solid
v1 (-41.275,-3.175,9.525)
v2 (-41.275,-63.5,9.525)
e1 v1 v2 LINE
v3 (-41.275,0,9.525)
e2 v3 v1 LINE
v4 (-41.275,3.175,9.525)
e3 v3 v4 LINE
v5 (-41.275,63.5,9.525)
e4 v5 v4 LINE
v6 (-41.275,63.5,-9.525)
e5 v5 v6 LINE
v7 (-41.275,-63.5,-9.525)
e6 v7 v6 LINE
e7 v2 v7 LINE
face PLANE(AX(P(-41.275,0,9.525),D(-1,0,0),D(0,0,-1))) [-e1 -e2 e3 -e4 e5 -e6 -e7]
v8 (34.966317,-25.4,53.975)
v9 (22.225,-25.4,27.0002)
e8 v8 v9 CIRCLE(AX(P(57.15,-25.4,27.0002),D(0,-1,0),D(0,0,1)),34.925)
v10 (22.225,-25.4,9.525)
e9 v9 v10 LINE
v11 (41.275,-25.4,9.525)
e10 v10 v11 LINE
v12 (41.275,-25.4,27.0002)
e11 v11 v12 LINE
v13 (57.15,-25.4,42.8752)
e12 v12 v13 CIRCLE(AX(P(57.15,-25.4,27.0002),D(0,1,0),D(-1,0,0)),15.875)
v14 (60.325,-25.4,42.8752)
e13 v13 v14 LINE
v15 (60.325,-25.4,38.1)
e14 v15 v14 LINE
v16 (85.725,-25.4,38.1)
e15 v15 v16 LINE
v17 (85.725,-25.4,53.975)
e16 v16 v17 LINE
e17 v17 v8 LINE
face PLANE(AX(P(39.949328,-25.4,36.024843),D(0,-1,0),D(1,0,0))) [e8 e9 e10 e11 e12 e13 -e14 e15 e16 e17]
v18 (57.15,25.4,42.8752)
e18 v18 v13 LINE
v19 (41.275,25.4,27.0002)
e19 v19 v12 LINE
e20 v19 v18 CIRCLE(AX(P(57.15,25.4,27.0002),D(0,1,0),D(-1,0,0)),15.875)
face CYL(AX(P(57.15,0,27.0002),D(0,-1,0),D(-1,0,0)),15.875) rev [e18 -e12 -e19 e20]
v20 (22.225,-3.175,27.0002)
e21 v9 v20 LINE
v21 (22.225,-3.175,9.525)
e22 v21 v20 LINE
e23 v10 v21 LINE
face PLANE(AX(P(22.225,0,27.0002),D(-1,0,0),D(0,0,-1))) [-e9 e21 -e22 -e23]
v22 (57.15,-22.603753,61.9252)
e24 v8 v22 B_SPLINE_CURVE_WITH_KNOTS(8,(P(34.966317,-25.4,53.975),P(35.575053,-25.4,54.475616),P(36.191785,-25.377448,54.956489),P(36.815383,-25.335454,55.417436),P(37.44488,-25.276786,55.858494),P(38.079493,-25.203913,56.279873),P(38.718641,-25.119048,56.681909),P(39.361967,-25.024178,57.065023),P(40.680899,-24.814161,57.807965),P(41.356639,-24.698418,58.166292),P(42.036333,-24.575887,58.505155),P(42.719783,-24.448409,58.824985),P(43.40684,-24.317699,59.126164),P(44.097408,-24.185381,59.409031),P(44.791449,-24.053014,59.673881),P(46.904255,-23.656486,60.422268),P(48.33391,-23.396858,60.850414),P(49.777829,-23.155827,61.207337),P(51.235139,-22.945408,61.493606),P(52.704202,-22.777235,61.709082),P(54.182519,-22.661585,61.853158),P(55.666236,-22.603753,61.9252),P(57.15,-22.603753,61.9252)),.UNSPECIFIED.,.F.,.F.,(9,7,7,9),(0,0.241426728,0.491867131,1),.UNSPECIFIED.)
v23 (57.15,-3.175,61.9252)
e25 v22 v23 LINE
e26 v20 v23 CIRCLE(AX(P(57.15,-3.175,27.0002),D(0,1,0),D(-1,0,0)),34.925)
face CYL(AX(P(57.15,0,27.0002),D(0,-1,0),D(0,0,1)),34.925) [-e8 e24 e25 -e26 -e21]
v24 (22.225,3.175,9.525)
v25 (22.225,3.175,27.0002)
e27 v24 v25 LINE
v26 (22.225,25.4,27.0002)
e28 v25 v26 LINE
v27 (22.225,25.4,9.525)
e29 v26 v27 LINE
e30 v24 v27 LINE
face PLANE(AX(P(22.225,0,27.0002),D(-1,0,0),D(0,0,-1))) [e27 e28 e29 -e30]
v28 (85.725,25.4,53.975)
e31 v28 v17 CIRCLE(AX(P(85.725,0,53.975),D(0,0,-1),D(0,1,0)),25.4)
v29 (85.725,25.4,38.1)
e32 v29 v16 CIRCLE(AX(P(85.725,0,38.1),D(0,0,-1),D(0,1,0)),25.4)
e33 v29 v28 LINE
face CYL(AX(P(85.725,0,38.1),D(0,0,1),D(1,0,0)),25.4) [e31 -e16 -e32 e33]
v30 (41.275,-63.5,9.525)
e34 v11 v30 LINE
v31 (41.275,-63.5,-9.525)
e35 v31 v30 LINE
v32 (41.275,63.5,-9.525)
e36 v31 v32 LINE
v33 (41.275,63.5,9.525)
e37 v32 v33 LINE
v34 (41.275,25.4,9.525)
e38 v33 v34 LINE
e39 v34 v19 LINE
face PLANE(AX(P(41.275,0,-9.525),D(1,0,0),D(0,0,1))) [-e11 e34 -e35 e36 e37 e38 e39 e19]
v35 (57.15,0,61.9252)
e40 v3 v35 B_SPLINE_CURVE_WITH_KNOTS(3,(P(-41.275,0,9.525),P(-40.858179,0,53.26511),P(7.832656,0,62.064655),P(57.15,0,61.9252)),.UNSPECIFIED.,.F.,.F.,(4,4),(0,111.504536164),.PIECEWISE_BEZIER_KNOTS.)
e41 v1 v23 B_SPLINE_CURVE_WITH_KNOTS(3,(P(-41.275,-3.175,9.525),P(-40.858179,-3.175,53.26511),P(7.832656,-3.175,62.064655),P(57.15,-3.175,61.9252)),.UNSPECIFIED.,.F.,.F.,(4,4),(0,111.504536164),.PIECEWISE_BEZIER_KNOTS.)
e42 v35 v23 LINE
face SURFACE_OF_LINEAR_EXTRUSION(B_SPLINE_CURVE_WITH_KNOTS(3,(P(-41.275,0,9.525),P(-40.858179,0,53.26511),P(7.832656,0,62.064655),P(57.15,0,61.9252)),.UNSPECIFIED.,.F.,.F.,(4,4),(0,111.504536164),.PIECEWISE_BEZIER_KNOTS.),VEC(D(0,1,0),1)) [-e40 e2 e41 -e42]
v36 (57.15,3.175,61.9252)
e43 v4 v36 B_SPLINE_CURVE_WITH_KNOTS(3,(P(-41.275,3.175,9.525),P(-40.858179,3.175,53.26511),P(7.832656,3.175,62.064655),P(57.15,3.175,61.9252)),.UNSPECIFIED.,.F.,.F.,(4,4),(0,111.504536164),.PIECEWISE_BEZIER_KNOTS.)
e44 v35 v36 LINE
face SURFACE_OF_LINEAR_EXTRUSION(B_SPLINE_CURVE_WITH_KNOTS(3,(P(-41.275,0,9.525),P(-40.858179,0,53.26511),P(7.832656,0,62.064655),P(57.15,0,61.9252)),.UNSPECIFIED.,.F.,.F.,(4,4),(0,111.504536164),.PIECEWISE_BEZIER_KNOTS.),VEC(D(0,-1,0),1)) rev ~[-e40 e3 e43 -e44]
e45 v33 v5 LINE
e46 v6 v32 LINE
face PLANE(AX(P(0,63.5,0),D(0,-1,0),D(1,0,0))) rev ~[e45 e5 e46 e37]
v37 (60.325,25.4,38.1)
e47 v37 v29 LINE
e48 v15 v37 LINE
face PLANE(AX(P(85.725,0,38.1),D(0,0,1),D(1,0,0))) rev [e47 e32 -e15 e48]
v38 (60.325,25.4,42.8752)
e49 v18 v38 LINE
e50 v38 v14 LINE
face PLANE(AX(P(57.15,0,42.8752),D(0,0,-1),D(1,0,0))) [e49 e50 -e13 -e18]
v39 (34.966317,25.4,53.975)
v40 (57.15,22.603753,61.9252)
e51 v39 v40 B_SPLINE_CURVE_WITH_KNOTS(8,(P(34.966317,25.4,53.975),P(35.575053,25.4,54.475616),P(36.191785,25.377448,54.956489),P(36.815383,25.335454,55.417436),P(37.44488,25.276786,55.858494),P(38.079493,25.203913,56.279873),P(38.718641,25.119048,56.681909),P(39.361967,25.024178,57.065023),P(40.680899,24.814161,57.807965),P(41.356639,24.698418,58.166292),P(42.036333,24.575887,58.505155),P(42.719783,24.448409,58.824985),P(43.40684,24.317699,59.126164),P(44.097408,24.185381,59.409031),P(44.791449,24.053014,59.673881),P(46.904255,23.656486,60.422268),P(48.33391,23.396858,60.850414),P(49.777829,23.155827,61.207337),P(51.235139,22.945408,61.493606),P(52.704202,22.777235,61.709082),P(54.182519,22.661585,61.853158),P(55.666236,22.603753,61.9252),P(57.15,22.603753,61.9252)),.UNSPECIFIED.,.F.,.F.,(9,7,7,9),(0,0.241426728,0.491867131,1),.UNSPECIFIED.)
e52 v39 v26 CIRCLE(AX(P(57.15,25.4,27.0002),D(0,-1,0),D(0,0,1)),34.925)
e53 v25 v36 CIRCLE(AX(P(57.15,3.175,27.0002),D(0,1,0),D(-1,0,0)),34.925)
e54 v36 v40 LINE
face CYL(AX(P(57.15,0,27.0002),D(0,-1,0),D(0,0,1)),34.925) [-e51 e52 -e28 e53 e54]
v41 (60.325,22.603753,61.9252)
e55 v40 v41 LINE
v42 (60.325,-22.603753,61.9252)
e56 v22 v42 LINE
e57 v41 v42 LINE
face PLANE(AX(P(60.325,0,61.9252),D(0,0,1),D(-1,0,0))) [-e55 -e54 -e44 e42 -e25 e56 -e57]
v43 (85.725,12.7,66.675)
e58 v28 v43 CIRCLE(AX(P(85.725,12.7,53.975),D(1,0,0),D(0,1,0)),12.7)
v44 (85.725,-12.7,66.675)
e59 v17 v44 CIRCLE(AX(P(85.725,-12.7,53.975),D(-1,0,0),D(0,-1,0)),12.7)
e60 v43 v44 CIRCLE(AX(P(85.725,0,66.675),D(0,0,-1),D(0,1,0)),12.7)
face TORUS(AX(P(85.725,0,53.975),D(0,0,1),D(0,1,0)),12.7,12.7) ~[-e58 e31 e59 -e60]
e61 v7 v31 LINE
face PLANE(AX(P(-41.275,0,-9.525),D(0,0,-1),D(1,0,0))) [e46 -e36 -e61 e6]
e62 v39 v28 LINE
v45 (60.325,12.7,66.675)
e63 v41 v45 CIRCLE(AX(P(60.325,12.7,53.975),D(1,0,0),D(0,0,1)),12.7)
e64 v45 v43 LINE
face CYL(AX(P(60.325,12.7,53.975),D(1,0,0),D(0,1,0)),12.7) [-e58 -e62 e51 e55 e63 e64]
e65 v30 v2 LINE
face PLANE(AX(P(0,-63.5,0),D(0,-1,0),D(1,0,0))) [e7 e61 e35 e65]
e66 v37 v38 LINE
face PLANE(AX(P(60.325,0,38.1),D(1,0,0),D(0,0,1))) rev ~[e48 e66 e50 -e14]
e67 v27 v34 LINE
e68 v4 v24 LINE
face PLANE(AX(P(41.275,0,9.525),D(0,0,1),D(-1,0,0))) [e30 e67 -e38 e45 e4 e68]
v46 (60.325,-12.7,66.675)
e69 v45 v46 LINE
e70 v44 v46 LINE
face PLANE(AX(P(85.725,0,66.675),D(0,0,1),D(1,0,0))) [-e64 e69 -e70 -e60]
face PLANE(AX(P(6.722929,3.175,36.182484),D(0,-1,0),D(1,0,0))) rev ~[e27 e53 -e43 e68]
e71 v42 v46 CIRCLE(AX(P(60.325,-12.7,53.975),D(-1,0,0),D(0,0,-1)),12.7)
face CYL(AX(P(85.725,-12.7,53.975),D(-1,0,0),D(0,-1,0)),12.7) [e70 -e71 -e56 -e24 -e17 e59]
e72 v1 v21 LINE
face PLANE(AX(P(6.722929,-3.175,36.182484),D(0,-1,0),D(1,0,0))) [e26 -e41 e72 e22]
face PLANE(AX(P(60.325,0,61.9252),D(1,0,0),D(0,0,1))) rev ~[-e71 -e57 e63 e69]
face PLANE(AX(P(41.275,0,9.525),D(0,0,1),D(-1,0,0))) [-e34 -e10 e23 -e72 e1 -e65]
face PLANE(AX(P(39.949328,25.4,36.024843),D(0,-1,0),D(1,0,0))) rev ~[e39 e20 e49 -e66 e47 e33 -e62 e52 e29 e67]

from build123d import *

# Parameters (mm, degrees)
F1_DEPTH = 63.5
F0_W     = 25.4
F0_H     = 4.7752
F0_H_2   = 19.05
F0_H_3   = 4.7498
F2_DEPTH = 25.4
F4_DEPTH = 3.175
F5_R     = 12.7


with BuildPart() as f1:
    # F0 (on Front) → F1 (new body, symmetric)
    with BuildSketch(Plane.XZ):
        Polygon((41.275, -9.525), (41.275, 9.525), (22.225, 9.525), (-41.275, 9.525), (-41.275, -9.525), align=None)
    extrude(amount=F1_DEPTH, both=True)

    # F0 (on Front) → F2 (join, symmetric)
    with BuildSketch(Plane.XZ):
        with BuildLine():
            Line((22.225, 9.525), (41.275, 9.525))
            Line((41.275, 9.525), (41.275, 27.0002))
            ThreePointArc((41.275, 27.0002), (45.9246798487, 38.2255201513), (57.15, 42.8752))
            Line((57.15, 42.8752), (60.325, 42.8752))
            Line((60.325, 42.8752), (60.325, 61.9252))
            Line((60.325, 61.9252), (57.15, 61.9252))
            ThreePointArc((57.15, 61.9252), (32.4542956671, 51.6959043329), (22.225, 27.0002))
            Line((22.225, 27.0002), (22.225, 9.525))
        make_face()
        with Locations((73.025, 40.4876)):
            Rectangle(F0_W, F0_H)
        with Locations((73.025, 52.4002)):
            Rectangle(F0_W, F0_H_2)
        with Locations((73.025, 64.3001)):
            Rectangle(F0_W, F0_H_3)
    extrude(amount=F2_DEPTH, both=True)

    # F0 (on Front) → F3 (revolve)
    with BuildSketch(Plane.XZ):
        Polygon((85.725, 61.9252), (85.725, 42.8752), (85.725, 38.1), (111.125, 38.1), (111.125, 66.675), (85.725, 66.675), align=None)
    revolve(axis=Axis((85.725, 0, 52.3875), (0, 0, 1)))

    # F0 (on Front) → F4 (join, symmetric)
    with BuildSketch(Plane.XZ):
        with BuildLine():
            Line((-41.275, 9.525), (22.225, 9.525))
            Line((22.225, 9.525), (22.225, 27.0002))
            ThreePointArc((22.225, 27.0002), (32.4542956671, 51.6959043329), (57.15, 61.9252))
            add(Edge.make_bspline(
                [(-41.275, 9.525), (-40.8581793308, 53.2651096582), (7.8326556832, 62.0646551251), (57.15, 61.9252)],
                knots=[0, 0, 0, 0, 111.5045361635, 111.5045361635, 111.5045361635, 111.5045361635], degree=3))
        make_face()
    extrude(amount=F4_DEPTH, both=True)

    # F5
    f5_edges = [f1.edges().sort_by_distance(p)[0] for p in [
        (85.725, 25.4, 52.3875),
        (73.025, 25.4, 66.675),
        (73.025, -25.4, 66.675),
        (111.125, 0, 66.675),
    ]]
    fillet(f5_edges, radius=F5_R)


solid = f1.part
